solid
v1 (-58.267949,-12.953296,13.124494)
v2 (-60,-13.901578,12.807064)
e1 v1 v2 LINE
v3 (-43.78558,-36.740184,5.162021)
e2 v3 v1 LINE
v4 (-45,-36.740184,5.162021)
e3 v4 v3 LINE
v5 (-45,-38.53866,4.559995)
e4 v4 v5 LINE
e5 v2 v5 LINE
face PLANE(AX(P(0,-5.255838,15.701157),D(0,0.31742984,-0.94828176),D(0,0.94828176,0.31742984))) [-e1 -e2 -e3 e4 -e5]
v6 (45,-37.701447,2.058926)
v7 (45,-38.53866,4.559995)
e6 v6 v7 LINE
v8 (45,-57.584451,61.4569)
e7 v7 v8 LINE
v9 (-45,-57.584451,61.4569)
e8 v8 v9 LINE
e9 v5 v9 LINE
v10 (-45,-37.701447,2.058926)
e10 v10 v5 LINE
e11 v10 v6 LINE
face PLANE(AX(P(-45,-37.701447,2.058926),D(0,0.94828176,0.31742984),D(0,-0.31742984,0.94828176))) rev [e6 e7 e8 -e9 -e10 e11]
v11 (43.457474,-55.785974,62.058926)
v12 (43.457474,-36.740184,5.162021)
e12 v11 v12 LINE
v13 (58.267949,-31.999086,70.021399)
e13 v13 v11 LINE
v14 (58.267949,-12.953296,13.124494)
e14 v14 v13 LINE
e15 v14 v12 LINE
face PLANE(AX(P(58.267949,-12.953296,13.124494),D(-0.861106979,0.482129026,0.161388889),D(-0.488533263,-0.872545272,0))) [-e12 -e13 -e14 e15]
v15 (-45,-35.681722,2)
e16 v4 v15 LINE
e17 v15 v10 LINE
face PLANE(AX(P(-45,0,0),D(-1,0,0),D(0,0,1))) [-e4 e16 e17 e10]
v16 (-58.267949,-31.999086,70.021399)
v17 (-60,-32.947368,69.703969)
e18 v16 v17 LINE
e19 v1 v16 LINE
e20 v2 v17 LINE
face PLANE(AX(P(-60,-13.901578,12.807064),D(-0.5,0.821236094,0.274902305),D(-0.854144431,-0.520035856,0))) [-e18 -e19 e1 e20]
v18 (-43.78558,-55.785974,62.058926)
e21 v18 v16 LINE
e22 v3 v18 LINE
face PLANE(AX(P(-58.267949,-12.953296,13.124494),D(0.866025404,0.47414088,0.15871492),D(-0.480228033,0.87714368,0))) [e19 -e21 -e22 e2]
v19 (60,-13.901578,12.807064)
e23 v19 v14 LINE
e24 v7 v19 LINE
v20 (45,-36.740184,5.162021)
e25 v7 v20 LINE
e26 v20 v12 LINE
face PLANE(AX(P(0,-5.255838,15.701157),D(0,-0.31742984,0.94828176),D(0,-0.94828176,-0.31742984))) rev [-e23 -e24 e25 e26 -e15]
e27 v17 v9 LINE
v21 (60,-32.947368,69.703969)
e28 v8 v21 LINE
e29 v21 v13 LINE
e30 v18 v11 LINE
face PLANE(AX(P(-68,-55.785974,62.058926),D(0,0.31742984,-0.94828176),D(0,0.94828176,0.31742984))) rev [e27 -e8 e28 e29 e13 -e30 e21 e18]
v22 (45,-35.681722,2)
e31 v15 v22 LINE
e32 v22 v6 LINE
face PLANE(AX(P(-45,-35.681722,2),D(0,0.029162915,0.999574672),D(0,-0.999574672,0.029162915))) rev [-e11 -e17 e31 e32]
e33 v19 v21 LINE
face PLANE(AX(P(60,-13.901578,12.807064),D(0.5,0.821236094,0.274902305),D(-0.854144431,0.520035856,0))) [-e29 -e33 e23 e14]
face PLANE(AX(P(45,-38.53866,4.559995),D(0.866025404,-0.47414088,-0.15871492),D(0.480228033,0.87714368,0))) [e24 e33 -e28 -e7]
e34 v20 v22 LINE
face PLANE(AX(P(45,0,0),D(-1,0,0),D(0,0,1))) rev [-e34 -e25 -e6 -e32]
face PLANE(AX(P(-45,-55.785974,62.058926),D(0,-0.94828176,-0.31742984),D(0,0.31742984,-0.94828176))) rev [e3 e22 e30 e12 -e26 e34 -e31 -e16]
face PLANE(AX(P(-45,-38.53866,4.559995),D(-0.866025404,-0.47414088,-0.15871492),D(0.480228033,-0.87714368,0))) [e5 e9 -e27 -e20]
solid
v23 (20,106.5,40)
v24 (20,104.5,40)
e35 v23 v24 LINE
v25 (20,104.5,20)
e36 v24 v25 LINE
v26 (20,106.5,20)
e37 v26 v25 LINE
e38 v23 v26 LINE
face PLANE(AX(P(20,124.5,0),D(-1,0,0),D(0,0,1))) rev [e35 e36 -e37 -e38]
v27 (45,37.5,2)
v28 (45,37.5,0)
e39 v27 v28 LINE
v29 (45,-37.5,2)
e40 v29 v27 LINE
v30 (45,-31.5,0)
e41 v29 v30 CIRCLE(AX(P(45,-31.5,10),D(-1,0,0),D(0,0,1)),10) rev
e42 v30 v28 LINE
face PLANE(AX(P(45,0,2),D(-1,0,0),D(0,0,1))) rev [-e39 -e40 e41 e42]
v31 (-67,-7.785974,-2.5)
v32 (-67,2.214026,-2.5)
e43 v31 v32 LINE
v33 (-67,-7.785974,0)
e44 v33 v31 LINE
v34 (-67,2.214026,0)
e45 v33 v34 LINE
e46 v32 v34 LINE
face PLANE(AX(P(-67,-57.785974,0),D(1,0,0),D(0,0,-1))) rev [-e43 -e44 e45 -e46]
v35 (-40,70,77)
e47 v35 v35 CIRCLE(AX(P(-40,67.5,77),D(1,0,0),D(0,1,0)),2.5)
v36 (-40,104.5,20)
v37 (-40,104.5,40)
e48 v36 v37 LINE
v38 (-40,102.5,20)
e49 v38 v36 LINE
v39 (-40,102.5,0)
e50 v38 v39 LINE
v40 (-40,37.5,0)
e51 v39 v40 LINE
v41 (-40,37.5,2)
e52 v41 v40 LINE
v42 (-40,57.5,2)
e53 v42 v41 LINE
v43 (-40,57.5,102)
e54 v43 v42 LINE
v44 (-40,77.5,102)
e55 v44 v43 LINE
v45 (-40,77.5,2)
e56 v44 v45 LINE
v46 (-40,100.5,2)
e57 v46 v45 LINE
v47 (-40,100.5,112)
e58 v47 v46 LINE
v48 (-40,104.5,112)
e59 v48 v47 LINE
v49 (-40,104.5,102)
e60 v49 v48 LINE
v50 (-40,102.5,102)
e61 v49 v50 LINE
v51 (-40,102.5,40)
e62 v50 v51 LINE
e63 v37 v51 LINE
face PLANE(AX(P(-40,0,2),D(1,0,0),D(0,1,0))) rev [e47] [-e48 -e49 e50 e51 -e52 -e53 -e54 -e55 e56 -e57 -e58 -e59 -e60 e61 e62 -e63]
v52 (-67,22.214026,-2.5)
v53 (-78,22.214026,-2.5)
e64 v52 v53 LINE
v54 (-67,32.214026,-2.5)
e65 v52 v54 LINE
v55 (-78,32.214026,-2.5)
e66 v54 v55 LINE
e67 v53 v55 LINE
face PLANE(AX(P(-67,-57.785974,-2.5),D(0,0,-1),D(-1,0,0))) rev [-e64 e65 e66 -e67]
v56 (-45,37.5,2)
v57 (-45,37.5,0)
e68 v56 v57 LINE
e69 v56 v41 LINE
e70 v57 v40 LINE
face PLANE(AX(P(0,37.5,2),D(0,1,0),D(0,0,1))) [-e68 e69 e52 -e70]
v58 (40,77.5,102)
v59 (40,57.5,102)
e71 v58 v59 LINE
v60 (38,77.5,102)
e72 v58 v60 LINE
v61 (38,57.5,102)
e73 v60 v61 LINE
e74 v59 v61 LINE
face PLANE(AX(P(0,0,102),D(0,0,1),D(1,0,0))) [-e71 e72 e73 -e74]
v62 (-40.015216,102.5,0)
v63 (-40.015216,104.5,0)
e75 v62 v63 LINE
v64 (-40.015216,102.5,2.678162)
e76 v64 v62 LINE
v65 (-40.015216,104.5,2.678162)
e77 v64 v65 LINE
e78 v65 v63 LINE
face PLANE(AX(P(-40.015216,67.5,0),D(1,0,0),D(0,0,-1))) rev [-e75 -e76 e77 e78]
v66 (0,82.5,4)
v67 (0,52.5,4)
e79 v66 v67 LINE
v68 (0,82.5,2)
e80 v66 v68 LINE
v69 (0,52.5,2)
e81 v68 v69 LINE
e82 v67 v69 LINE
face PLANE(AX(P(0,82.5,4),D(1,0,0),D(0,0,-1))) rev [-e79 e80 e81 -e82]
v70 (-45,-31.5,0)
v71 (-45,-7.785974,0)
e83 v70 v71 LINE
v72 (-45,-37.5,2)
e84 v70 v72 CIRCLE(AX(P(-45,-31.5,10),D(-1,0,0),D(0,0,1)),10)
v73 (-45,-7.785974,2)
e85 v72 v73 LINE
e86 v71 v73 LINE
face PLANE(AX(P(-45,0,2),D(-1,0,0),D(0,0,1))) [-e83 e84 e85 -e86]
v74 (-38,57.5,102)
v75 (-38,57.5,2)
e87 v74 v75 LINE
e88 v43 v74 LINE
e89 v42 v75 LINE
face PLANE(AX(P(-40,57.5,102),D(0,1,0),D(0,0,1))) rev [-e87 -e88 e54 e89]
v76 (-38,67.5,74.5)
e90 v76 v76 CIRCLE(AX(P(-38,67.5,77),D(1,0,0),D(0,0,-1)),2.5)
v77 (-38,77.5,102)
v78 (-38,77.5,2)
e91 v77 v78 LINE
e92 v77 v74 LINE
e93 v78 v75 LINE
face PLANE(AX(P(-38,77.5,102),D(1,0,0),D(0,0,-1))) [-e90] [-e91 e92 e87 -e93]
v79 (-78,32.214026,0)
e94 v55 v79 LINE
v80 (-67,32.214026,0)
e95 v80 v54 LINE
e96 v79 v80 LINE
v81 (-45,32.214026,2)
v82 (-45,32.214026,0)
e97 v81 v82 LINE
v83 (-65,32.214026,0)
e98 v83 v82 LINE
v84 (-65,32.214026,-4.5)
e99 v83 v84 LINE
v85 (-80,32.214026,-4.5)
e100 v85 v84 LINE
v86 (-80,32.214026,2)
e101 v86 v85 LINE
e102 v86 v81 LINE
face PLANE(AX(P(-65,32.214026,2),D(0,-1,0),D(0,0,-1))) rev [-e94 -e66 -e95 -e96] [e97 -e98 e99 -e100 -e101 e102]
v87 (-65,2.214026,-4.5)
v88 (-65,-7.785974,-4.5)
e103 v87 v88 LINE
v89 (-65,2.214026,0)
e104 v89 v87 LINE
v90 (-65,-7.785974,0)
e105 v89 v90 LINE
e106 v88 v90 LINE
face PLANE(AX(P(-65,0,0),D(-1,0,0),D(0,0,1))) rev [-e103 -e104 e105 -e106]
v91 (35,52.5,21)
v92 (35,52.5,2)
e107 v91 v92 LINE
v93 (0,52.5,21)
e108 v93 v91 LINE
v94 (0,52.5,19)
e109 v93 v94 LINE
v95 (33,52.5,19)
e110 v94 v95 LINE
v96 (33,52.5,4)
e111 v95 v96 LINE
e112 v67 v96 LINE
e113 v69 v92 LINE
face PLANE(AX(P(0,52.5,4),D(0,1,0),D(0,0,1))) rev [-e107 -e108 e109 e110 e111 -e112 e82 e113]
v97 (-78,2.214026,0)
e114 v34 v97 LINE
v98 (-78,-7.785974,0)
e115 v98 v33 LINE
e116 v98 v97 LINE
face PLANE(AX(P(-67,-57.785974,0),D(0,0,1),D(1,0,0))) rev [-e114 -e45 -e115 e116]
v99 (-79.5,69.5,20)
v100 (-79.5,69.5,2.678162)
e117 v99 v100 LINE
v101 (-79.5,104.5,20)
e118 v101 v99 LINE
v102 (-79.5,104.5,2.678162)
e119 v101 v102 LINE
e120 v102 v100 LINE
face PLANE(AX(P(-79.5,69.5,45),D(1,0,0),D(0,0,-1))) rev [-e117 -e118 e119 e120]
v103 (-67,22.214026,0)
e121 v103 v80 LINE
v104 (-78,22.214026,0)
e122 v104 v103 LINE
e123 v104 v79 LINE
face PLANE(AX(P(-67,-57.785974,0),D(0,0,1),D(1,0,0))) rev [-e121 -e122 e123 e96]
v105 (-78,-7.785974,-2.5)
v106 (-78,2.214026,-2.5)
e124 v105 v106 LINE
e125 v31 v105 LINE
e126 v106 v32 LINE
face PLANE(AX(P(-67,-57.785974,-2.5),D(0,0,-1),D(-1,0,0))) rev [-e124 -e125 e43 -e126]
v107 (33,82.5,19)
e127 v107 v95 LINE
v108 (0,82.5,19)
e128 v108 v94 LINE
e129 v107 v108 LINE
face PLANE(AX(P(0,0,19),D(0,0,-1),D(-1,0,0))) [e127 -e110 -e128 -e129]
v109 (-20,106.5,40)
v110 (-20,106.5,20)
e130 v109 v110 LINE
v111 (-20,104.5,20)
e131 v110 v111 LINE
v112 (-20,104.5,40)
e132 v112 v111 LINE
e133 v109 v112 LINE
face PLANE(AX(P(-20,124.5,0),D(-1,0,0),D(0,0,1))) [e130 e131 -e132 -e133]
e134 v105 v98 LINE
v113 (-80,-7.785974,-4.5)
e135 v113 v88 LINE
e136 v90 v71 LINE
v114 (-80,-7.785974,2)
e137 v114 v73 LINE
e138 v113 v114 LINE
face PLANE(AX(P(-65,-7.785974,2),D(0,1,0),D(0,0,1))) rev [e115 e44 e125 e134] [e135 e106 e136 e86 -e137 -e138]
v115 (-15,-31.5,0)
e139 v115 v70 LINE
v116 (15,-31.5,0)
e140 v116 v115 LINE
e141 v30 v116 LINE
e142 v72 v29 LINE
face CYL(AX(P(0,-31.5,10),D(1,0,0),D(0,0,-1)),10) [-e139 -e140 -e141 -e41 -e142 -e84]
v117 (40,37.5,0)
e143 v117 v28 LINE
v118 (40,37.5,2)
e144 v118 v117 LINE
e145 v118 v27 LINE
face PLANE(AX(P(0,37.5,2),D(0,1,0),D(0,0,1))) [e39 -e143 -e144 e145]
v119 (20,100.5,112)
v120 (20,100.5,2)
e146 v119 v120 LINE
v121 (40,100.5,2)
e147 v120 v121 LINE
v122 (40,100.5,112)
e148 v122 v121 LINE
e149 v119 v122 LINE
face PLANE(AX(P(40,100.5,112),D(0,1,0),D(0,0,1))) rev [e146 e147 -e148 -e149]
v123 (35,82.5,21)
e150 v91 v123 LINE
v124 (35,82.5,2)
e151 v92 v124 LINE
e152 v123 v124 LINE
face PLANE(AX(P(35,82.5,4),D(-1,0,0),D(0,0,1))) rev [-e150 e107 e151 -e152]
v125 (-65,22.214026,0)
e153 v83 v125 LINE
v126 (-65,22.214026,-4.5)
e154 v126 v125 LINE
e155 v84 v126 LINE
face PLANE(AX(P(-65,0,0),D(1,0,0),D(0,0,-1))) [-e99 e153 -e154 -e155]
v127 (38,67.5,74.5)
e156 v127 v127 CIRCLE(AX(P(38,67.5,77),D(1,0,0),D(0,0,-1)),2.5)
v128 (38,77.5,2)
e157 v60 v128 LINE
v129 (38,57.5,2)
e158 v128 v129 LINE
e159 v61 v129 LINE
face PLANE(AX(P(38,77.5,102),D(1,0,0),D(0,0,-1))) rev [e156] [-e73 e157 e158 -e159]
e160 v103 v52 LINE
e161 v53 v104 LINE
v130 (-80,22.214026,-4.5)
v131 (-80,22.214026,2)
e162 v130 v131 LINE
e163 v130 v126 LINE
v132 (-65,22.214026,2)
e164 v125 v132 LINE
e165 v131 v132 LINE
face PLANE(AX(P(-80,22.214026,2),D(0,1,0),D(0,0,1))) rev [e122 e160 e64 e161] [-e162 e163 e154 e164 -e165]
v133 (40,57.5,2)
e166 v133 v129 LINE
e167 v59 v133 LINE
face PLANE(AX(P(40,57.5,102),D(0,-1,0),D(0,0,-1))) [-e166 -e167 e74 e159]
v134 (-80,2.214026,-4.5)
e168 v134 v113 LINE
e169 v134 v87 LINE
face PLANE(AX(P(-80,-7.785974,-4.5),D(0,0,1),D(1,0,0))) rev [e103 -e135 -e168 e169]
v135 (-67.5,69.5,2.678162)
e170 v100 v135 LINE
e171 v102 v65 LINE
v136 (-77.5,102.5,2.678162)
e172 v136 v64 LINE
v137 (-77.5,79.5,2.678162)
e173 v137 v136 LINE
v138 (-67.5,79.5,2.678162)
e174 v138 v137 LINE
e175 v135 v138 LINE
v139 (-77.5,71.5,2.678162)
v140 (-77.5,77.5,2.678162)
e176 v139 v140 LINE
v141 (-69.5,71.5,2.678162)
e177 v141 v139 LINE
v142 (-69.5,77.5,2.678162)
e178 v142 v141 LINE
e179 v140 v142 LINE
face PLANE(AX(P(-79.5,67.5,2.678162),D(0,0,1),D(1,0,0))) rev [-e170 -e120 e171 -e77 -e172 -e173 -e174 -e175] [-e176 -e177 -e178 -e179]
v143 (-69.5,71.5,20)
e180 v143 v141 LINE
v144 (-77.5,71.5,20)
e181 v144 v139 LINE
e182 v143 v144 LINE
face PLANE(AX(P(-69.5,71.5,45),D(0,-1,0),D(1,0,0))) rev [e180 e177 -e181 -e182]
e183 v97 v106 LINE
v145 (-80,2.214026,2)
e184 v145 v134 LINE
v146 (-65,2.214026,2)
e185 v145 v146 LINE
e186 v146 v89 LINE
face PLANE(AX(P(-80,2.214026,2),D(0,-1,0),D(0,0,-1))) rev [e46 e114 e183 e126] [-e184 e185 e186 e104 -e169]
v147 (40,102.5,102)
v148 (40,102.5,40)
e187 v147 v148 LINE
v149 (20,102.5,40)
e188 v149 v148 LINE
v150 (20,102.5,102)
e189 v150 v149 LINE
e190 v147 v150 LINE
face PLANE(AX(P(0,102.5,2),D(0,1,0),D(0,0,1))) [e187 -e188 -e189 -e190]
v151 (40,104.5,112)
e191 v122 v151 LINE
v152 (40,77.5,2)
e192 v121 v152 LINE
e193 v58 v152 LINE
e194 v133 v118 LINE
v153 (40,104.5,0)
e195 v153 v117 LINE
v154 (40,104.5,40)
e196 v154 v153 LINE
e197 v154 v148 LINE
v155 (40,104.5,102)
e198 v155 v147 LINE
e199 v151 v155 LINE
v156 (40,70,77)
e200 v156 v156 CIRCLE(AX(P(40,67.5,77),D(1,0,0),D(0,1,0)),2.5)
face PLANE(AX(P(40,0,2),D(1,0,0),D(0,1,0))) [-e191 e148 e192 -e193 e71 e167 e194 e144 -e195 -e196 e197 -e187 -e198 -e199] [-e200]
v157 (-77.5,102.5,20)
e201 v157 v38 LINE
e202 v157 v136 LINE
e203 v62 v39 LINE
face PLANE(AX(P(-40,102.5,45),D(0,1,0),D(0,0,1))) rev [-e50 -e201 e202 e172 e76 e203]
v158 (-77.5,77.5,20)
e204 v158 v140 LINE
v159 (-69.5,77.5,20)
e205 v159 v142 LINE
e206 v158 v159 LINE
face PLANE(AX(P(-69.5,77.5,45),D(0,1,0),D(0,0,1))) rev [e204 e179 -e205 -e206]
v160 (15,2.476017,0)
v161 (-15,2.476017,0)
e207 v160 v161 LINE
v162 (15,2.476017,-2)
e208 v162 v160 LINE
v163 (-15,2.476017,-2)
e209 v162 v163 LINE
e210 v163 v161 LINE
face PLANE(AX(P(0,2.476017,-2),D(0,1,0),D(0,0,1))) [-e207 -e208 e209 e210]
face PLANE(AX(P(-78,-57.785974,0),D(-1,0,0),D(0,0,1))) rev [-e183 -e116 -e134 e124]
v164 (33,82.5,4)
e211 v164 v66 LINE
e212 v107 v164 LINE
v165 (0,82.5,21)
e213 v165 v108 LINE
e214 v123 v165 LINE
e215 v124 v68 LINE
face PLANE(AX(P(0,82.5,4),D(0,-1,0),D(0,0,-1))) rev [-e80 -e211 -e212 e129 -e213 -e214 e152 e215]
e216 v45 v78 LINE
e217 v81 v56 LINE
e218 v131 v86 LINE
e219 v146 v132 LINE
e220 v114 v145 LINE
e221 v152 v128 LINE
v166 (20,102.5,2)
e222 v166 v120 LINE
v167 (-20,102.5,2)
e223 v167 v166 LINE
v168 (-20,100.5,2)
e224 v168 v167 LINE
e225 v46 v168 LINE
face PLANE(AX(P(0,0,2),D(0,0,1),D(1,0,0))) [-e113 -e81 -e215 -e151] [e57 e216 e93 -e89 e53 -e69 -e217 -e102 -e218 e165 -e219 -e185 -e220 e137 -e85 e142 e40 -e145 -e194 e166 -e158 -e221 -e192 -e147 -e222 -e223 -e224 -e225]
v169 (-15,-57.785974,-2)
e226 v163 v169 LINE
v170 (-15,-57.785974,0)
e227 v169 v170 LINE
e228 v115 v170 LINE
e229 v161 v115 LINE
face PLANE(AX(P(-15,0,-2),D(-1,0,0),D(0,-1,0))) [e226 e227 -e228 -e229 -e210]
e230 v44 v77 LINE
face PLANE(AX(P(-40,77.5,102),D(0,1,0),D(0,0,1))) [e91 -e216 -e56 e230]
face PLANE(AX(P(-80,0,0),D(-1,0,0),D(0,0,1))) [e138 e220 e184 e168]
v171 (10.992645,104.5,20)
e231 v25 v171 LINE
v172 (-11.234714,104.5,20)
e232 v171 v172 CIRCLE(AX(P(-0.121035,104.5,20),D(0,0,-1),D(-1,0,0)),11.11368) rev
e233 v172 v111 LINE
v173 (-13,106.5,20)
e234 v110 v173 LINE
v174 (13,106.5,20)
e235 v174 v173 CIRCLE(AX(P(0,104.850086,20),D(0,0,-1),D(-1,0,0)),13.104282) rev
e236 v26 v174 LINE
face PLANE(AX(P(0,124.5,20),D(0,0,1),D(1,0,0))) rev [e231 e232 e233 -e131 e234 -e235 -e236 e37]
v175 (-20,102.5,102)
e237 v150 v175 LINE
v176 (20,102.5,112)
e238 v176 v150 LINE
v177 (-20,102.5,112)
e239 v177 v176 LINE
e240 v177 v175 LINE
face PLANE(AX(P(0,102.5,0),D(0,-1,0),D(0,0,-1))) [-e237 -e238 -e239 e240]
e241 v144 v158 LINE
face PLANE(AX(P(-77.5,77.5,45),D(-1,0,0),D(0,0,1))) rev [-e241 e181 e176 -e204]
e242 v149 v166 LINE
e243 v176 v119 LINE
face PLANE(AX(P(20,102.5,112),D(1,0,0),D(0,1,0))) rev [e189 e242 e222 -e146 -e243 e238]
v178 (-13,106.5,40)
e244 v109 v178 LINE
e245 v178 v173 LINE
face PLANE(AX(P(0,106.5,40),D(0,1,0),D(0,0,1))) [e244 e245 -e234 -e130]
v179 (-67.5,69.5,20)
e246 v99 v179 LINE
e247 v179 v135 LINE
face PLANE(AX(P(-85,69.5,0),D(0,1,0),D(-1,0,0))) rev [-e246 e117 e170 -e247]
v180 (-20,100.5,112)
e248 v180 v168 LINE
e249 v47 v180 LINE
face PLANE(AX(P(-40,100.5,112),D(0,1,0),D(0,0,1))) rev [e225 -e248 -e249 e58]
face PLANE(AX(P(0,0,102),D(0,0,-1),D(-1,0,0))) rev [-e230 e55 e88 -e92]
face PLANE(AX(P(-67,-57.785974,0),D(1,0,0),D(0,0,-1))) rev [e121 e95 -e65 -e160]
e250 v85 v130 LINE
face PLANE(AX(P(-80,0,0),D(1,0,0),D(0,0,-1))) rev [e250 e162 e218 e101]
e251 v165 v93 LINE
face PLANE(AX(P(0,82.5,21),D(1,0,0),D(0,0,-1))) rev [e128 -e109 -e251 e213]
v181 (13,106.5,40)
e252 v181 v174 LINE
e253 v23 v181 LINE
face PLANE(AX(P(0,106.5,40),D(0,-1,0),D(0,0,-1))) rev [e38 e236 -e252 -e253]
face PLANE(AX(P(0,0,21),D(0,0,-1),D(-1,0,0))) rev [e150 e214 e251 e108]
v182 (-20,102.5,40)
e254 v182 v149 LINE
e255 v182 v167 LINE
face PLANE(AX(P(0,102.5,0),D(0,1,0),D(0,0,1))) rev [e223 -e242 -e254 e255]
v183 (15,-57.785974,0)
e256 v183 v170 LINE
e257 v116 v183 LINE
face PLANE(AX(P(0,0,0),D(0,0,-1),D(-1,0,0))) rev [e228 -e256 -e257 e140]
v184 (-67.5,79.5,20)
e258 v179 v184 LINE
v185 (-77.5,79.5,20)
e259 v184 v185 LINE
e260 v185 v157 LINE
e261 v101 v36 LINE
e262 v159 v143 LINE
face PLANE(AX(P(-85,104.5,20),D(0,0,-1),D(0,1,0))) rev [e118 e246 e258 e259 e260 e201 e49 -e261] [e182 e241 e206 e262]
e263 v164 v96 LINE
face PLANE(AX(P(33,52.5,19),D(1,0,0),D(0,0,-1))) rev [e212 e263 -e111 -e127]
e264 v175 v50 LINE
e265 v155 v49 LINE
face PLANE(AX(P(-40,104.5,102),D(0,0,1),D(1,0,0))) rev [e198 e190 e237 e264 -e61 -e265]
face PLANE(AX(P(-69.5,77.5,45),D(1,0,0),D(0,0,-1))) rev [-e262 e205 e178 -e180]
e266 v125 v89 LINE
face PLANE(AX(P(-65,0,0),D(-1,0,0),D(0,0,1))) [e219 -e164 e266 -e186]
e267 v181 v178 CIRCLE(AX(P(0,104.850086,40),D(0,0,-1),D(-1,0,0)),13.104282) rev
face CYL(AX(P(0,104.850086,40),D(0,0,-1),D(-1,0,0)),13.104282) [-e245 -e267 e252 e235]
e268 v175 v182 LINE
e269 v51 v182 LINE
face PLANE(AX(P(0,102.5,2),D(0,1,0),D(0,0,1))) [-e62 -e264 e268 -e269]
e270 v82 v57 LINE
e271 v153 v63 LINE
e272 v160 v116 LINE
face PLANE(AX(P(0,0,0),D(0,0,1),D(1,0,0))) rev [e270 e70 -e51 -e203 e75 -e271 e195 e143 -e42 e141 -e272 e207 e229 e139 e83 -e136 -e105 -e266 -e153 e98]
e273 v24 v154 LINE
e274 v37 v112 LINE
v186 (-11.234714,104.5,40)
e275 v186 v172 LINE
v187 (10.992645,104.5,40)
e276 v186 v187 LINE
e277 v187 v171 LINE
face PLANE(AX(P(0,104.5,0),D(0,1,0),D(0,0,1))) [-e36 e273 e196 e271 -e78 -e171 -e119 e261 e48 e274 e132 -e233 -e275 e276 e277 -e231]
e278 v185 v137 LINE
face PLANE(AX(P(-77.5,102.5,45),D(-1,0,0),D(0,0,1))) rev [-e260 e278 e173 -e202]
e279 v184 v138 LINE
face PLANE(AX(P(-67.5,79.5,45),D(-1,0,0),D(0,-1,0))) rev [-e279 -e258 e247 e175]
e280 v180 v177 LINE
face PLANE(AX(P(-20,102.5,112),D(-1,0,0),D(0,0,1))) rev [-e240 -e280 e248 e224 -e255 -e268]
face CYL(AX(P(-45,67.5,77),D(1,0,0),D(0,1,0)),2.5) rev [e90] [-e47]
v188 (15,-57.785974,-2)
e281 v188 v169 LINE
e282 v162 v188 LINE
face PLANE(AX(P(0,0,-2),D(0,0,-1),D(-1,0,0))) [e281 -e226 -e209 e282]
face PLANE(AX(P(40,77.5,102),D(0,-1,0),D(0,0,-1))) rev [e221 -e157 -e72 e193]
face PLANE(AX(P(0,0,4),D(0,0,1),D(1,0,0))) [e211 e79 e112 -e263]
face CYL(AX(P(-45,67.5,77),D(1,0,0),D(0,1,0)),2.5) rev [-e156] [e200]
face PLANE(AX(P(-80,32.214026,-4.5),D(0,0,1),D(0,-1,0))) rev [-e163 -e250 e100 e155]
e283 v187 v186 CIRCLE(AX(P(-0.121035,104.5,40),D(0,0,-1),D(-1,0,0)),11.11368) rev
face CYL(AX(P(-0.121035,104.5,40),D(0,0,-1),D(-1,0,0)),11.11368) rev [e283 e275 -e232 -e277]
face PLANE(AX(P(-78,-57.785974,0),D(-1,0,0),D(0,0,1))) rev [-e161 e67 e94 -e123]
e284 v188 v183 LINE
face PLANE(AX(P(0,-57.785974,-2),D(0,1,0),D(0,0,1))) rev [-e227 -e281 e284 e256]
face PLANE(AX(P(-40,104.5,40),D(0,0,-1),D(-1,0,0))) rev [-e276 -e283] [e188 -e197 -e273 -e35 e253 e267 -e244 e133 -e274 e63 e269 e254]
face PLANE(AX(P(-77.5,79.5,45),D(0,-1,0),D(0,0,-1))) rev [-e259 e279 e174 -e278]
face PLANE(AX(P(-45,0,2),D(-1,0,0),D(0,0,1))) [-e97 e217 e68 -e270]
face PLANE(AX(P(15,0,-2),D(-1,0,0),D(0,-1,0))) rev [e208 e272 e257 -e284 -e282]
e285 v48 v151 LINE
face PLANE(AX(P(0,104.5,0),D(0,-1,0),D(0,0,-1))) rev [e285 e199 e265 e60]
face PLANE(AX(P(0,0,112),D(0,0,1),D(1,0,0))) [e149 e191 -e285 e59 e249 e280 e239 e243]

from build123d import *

# Parameters (mm, degrees)
SKETCH3_W            = 80
SKETCH3_H            = 65
SKETCH3_W_2          = 90
SKETCH3_H_2          = 75
BOSS_EXTRUDE1_DEPTH  = 2
SKETCH6_W            = 2
SKETCH6_H            = 20
BOSS_EXTRUDE2_DEPTH  = 100
SKETCH7_R            = 2.5
CUT_EXTRUDE2_DEPTH   = 168.735655124
SKETCH9_W            = 20
SKETCH9_H            = 2
BOSS_EXTRUDE3_DEPTH  = 110
BOSS_EXTRUDE4_DEPTH  = 90
FILLET1_R            = 10
SKETCH12_W           = 30
SKETCH12_H           = 60.261991402
BOSS_EXTRUDE5_DEPTH  = 2
CUT_EXTRUDE3_DEPTH   = 113
BOSS_EXTRUDE10_DEPTH = 60
SKETCH18_W           = 35
SKETCH18_H           = 30
BOSS_EXTRUDE11_DEPTH = 2
SKETCH19_W           = 2
SKETCH19_H           = 30
BOSS_EXTRUDE12_DEPTH = 15
SKETCH20_W           = 35
SKETCH20_H           = 30
BOSS_EXTRUDE13_DEPTH = 2
SKETCH21_W           = 80
SKETCH21_H           = 10
SKETCH21_H_2         = 40
BOSS_EXTRUDE14_DEPTH = 2
SKETCH22_W           = 20
SKETCH22_H           = 20
BOSS_EXTRUDE15_DEPTH = 20
CUT_EXTRUDE4_DEPTH   = 20
SKETCH24_W           = 2
SKETCH24_H           = 40
BOSS_EXTRUDE16_DEPTH = 20
SKETCH25_W           = 6.5
SKETCH25_H           = 10
BOSS_EXTRUDE17_DEPTH = 15
SKETCH27_W           = 11
SKETCH27_H           = 2.5
CUT_EXTRUDE5_DEPTH   = 165.450600485
SKETCH29_W           = 20
SKETCH29_H           = 35
BOSS_EXTRUDE18_DEPTH = 45
SKETCH32_W           = 5.5
SKETCH32_H           = 35
SKETCH32_W_2         = 8
SKETCH32_H_2         = 6
CUT_EXTRUDE10_DEPTH  = 45
SKETCH33_W           = 39.484783522
SKETCH33_H           = 2.678161959
CUT_EXTRUDE12_DEPTH  = 37


with BuildPart() as part:
    # Sketch3 → Boss-Extrude1 (new body)
    with BuildSketch(Plane.XY):
        with Locations((0, 70)):
            Rectangle(SKETCH3_W, SKETCH3_H)
        Rectangle(SKETCH3_W_2, SKETCH3_H_2)
    extrude(amount=BOSS_EXTRUDE1_DEPTH)

    # Sketch6 → Boss-Extrude2 (add)
    with BuildSketch(Plane.XY.offset(2)):
        with Locations((-39, 67.5)):
            Rectangle(SKETCH6_W, SKETCH6_H)
        with Locations((39, 67.5)):
            Rectangle(SKETCH6_W, SKETCH6_H)
    extrude(amount=BOSS_EXTRUDE2_DEPTH)

    # Sketch7 → Cut-Extrude2 (cut, through all)
    with BuildSketch(Plane(origin=(40, 0, 0), x_dir=(0, 0, -1), z_dir=(1, 0, 0))):
        with Locations(Location((-77, 67.5, 0), (0, 0, 90))):
            Circle(SKETCH7_R)
    extrude(amount=-CUT_EXTRUDE2_DEPTH, mode=Mode.SUBTRACT)

    # Sketch9 → Boss-Extrude3 (add)
    with BuildSketch(Plane.XY.offset(2)):
        with Locations((-30, 101.5)):
            Rectangle(SKETCH9_W, SKETCH9_H)
        with Locations((30, 101.5)):
            Rectangle(SKETCH9_W, SKETCH9_H)
    extrude(amount=BOSS_EXTRUDE3_DEPTH)

    # Fillet1
    # the kernel refuses this fillet: 10 mm, written as the material it takes off along each edge
    with BuildSketch(Plane(origin=(-60, -37.5, 0), x_dir=(0, 0, 1), z_dir=(1, 0, 0))) as fillet1_piece_1:
        with BuildLine():
            CenterArc((10, -6), FILLET1_R, 143.130102354, 36.869897646)
            Line((0, -6), (-0.2, -6))
            Line((-0.2, -6), (-0.2, 0))
            Line((-0.2, 0), (0, 0.2))
            ThreePointArc((0, 0.2), (1, 0.2), (1.84, 0.12))
            Line((1.84, 0.12), (2, 0))
        make_face()
    extrude(amount=120, mode=Mode.SUBTRACT)

    # Sketch12 → Boss-Extrude5 (add)
    with BuildSketch(Plane(origin=(0, 0, 0), x_dir=(-1, 0, 0), z_dir=(0, 0, -1))):
        with Locations((0, -27.654978505)):
            Rectangle(SKETCH12_W, SKETCH12_H)
    extrude(amount=BOSS_EXTRUDE5_DEPTH)

    # Sketch18 → Boss-Extrude11 (add)
    with BuildSketch(Plane.XY.offset(2)):
        with Locations((17.5, 67.5)):
            Rectangle(SKETCH18_W, SKETCH18_H)
    extrude(amount=BOSS_EXTRUDE11_DEPTH)

    # Sketch19 → Boss-Extrude12 (add)
    with BuildSketch(Plane.XY.offset(4)):
        with Locations((34, 67.5)):
            Rectangle(SKETCH19_W, SKETCH19_H)
    extrude(amount=BOSS_EXTRUDE12_DEPTH)

    # Sketch20 → Boss-Extrude13 (add)
    with BuildSketch(Plane.XY.offset(19)):
        with Locations((17.5, 67.5)):
            Rectangle(SKETCH20_W, SKETCH20_H)
    extrude(amount=BOSS_EXTRUDE13_DEPTH)

    # Sketch21 → Boss-Extrude14 (add)
    with BuildSketch(Plane(origin=(0, 102.5, 0), x_dir=(1, 0, 0), z_dir=(0, 1, 0))):
        with Locations((0, -107)):
            Rectangle(SKETCH21_W, SKETCH21_H)
        with Locations((0, -20)):
            Rectangle(SKETCH21_W, SKETCH21_H_2)
    extrude(amount=BOSS_EXTRUDE14_DEPTH)

    # Sketch22 → Boss-Extrude15 (add)
    with BuildSketch(Plane(origin=(0, 104.5, 0), x_dir=(1, 0, 0), z_dir=(0, 1, 0))):
        with Locations((-10, -30)):
            Rectangle(SKETCH22_W, SKETCH22_H)
        with Locations((10, -30)):
            Rectangle(SKETCH22_W, SKETCH22_H)
    extrude(amount=BOSS_EXTRUDE15_DEPTH)

    # Sketch23 → Cut-Extrude4 (cut)
    with BuildSketch(Plane(origin=(0, 0, 20), x_dir=(-1, 0, 0), z_dir=(0, 0, -1))):
        with BuildLine():
            Line((-20, 124.5), (-20, 106.5))
            Line((-20, 106.5), (-13, 106.5))
            ThreePointArc((-13, 106.5), (0, 117.954368483), (13, 106.5))
            Line((13, 106.5), (20, 106.5))
            Line((20, 106.5), (20, 124.5))
            Line((20, 124.5), (-20, 124.5))
        make_face()
        with BuildLine():
            ThreePointArc((11.234714386, 104.5), (0.121034595, 115.61367979), (-10.992645195, 104.5))
            Line((-10.992645195, 104.5), (11.234714386, 104.5))
        make_face()
    extrude(amount=-CUT_EXTRUDE4_DEPTH, mode=Mode.SUBTRACT)

    # Sketch24 → Boss-Extrude16 (add)
    with BuildSketch(Plane.ZY.offset(45)):
        with Locations((1, 12.214025794)):
            Rectangle(SKETCH24_W, SKETCH24_H)
    extrude(amount=BOSS_EXTRUDE16_DEPTH)

    # Sketch25 → Boss-Extrude17 (add)
    with BuildSketch(Plane.ZY.offset(65)):
        with Locations((-1.25, 27.214025794)):
            Rectangle(SKETCH25_W, SKETCH25_H)
        with Locations((-1.25, -2.785974206)):
            Rectangle(SKETCH25_W, SKETCH25_H)
    extrude(amount=BOSS_EXTRUDE17_DEPTH)

    # Sketch27 → Cut-Extrude5 (cut, through all)
    with BuildSketch(Plane(origin=(0, 32.214025794, 0), x_dir=(1, 0, 0), z_dir=(0, 1, 0))):
        with Locations((-72.5, 1.25)):
            Rectangle(SKETCH27_W, SKETCH27_H)
    extrude(amount=-CUT_EXTRUDE5_DEPTH, mode=Mode.SUBTRACT)

    # Sketch29 → Boss-Extrude18 (add)
    with BuildSketch(Plane.ZY.offset(40)):
        with Locations((10, 87)):
            Rectangle(SKETCH29_W, SKETCH29_H)
    extrude(amount=BOSS_EXTRUDE18_DEPTH)

    # Sketch32 → Cut-Extrude10 (cut)
    with BuildSketch(Plane(origin=(0, 0, 0), x_dir=(-1, 0, 0), z_dir=(0, 0, -1))):
        Polygon((40, 102.5), (77.5, 102.5), (77.5, 79.5), (67.5, 79.5), (67.5, 69.5), (40, 69.5), align=None)
        with Locations((82.25, 87)):
            Rectangle(SKETCH32_W, SKETCH32_H)
        with Locations((73.5, 74.5)):
            Rectangle(SKETCH32_W_2, SKETCH32_H_2)
    extrude(amount=-CUT_EXTRUDE10_DEPTH, mode=Mode.SUBTRACT)

    # Sketch33 → Cut-Extrude12 (cut)
    with BuildSketch(Plane(origin=(0, 104.5, 0), x_dir=(1, 0, 0), z_dir=(0, 1, 0))):
        with Locations((-59.757608239, -1.33908098)):
            Rectangle(SKETCH33_W, SKETCH33_H)
    extrude(amount=-CUT_EXTRUDE12_DEPTH, mode=Mode.SUBTRACT)


with BuildPart() as body_2:
    # Sketch10 → Boss-Extrude4 (new body)
    with BuildSketch(Plane(origin=(45, 0, 0), x_dir=(0, 0, -1), z_dir=(1, 0, 0))):
        Polygon((-2.058926134, -37.701447462), (-62.058926134, -57.785974206), (-62.058926134, -55.785974206), (-2, -35.681722403), align=None)
    extrude(amount=-BOSS_EXTRUDE4_DEPTH)

    # Sketch14 → Cut-Extrude3 (cut)
    with BuildSketch(Plane(origin=(45, 0, 0), x_dir=(0, 0, -1), z_dir=(1, 0, 0))):
        Polygon((-62.058926134, -55.785974206), (-58.636316443, -66.010590601), (-73.036947703, -70.831088329), align=None)
    extrude(amount=-CUT_EXTRUDE3_DEPTH, mode=Mode.SUBTRACT)

    # Sketch15 → Boss-Extrude10 (add)
    with BuildSketch(Plane(origin=(0, -24.301628774, 72.598062431), x_dir=(1, 0, 0), z_dir=(0, -0.3174298395941448, 0.9482817603092635))):
        Polygon((-45, -35.098030373), (-60, -9.117268259), (-58.267949192, -8.117268259), (-42.690598923, -35.098030373), align=None)
        Polygon((45, -35.098030373), (60, -9.117268259), (58.267949192, -8.117268259), (42.337684751, -35.098030373), align=None)
    extrude(amount=-BOSS_EXTRUDE10_DEPTH)


solid = Compound([part.part, body_2.part])
